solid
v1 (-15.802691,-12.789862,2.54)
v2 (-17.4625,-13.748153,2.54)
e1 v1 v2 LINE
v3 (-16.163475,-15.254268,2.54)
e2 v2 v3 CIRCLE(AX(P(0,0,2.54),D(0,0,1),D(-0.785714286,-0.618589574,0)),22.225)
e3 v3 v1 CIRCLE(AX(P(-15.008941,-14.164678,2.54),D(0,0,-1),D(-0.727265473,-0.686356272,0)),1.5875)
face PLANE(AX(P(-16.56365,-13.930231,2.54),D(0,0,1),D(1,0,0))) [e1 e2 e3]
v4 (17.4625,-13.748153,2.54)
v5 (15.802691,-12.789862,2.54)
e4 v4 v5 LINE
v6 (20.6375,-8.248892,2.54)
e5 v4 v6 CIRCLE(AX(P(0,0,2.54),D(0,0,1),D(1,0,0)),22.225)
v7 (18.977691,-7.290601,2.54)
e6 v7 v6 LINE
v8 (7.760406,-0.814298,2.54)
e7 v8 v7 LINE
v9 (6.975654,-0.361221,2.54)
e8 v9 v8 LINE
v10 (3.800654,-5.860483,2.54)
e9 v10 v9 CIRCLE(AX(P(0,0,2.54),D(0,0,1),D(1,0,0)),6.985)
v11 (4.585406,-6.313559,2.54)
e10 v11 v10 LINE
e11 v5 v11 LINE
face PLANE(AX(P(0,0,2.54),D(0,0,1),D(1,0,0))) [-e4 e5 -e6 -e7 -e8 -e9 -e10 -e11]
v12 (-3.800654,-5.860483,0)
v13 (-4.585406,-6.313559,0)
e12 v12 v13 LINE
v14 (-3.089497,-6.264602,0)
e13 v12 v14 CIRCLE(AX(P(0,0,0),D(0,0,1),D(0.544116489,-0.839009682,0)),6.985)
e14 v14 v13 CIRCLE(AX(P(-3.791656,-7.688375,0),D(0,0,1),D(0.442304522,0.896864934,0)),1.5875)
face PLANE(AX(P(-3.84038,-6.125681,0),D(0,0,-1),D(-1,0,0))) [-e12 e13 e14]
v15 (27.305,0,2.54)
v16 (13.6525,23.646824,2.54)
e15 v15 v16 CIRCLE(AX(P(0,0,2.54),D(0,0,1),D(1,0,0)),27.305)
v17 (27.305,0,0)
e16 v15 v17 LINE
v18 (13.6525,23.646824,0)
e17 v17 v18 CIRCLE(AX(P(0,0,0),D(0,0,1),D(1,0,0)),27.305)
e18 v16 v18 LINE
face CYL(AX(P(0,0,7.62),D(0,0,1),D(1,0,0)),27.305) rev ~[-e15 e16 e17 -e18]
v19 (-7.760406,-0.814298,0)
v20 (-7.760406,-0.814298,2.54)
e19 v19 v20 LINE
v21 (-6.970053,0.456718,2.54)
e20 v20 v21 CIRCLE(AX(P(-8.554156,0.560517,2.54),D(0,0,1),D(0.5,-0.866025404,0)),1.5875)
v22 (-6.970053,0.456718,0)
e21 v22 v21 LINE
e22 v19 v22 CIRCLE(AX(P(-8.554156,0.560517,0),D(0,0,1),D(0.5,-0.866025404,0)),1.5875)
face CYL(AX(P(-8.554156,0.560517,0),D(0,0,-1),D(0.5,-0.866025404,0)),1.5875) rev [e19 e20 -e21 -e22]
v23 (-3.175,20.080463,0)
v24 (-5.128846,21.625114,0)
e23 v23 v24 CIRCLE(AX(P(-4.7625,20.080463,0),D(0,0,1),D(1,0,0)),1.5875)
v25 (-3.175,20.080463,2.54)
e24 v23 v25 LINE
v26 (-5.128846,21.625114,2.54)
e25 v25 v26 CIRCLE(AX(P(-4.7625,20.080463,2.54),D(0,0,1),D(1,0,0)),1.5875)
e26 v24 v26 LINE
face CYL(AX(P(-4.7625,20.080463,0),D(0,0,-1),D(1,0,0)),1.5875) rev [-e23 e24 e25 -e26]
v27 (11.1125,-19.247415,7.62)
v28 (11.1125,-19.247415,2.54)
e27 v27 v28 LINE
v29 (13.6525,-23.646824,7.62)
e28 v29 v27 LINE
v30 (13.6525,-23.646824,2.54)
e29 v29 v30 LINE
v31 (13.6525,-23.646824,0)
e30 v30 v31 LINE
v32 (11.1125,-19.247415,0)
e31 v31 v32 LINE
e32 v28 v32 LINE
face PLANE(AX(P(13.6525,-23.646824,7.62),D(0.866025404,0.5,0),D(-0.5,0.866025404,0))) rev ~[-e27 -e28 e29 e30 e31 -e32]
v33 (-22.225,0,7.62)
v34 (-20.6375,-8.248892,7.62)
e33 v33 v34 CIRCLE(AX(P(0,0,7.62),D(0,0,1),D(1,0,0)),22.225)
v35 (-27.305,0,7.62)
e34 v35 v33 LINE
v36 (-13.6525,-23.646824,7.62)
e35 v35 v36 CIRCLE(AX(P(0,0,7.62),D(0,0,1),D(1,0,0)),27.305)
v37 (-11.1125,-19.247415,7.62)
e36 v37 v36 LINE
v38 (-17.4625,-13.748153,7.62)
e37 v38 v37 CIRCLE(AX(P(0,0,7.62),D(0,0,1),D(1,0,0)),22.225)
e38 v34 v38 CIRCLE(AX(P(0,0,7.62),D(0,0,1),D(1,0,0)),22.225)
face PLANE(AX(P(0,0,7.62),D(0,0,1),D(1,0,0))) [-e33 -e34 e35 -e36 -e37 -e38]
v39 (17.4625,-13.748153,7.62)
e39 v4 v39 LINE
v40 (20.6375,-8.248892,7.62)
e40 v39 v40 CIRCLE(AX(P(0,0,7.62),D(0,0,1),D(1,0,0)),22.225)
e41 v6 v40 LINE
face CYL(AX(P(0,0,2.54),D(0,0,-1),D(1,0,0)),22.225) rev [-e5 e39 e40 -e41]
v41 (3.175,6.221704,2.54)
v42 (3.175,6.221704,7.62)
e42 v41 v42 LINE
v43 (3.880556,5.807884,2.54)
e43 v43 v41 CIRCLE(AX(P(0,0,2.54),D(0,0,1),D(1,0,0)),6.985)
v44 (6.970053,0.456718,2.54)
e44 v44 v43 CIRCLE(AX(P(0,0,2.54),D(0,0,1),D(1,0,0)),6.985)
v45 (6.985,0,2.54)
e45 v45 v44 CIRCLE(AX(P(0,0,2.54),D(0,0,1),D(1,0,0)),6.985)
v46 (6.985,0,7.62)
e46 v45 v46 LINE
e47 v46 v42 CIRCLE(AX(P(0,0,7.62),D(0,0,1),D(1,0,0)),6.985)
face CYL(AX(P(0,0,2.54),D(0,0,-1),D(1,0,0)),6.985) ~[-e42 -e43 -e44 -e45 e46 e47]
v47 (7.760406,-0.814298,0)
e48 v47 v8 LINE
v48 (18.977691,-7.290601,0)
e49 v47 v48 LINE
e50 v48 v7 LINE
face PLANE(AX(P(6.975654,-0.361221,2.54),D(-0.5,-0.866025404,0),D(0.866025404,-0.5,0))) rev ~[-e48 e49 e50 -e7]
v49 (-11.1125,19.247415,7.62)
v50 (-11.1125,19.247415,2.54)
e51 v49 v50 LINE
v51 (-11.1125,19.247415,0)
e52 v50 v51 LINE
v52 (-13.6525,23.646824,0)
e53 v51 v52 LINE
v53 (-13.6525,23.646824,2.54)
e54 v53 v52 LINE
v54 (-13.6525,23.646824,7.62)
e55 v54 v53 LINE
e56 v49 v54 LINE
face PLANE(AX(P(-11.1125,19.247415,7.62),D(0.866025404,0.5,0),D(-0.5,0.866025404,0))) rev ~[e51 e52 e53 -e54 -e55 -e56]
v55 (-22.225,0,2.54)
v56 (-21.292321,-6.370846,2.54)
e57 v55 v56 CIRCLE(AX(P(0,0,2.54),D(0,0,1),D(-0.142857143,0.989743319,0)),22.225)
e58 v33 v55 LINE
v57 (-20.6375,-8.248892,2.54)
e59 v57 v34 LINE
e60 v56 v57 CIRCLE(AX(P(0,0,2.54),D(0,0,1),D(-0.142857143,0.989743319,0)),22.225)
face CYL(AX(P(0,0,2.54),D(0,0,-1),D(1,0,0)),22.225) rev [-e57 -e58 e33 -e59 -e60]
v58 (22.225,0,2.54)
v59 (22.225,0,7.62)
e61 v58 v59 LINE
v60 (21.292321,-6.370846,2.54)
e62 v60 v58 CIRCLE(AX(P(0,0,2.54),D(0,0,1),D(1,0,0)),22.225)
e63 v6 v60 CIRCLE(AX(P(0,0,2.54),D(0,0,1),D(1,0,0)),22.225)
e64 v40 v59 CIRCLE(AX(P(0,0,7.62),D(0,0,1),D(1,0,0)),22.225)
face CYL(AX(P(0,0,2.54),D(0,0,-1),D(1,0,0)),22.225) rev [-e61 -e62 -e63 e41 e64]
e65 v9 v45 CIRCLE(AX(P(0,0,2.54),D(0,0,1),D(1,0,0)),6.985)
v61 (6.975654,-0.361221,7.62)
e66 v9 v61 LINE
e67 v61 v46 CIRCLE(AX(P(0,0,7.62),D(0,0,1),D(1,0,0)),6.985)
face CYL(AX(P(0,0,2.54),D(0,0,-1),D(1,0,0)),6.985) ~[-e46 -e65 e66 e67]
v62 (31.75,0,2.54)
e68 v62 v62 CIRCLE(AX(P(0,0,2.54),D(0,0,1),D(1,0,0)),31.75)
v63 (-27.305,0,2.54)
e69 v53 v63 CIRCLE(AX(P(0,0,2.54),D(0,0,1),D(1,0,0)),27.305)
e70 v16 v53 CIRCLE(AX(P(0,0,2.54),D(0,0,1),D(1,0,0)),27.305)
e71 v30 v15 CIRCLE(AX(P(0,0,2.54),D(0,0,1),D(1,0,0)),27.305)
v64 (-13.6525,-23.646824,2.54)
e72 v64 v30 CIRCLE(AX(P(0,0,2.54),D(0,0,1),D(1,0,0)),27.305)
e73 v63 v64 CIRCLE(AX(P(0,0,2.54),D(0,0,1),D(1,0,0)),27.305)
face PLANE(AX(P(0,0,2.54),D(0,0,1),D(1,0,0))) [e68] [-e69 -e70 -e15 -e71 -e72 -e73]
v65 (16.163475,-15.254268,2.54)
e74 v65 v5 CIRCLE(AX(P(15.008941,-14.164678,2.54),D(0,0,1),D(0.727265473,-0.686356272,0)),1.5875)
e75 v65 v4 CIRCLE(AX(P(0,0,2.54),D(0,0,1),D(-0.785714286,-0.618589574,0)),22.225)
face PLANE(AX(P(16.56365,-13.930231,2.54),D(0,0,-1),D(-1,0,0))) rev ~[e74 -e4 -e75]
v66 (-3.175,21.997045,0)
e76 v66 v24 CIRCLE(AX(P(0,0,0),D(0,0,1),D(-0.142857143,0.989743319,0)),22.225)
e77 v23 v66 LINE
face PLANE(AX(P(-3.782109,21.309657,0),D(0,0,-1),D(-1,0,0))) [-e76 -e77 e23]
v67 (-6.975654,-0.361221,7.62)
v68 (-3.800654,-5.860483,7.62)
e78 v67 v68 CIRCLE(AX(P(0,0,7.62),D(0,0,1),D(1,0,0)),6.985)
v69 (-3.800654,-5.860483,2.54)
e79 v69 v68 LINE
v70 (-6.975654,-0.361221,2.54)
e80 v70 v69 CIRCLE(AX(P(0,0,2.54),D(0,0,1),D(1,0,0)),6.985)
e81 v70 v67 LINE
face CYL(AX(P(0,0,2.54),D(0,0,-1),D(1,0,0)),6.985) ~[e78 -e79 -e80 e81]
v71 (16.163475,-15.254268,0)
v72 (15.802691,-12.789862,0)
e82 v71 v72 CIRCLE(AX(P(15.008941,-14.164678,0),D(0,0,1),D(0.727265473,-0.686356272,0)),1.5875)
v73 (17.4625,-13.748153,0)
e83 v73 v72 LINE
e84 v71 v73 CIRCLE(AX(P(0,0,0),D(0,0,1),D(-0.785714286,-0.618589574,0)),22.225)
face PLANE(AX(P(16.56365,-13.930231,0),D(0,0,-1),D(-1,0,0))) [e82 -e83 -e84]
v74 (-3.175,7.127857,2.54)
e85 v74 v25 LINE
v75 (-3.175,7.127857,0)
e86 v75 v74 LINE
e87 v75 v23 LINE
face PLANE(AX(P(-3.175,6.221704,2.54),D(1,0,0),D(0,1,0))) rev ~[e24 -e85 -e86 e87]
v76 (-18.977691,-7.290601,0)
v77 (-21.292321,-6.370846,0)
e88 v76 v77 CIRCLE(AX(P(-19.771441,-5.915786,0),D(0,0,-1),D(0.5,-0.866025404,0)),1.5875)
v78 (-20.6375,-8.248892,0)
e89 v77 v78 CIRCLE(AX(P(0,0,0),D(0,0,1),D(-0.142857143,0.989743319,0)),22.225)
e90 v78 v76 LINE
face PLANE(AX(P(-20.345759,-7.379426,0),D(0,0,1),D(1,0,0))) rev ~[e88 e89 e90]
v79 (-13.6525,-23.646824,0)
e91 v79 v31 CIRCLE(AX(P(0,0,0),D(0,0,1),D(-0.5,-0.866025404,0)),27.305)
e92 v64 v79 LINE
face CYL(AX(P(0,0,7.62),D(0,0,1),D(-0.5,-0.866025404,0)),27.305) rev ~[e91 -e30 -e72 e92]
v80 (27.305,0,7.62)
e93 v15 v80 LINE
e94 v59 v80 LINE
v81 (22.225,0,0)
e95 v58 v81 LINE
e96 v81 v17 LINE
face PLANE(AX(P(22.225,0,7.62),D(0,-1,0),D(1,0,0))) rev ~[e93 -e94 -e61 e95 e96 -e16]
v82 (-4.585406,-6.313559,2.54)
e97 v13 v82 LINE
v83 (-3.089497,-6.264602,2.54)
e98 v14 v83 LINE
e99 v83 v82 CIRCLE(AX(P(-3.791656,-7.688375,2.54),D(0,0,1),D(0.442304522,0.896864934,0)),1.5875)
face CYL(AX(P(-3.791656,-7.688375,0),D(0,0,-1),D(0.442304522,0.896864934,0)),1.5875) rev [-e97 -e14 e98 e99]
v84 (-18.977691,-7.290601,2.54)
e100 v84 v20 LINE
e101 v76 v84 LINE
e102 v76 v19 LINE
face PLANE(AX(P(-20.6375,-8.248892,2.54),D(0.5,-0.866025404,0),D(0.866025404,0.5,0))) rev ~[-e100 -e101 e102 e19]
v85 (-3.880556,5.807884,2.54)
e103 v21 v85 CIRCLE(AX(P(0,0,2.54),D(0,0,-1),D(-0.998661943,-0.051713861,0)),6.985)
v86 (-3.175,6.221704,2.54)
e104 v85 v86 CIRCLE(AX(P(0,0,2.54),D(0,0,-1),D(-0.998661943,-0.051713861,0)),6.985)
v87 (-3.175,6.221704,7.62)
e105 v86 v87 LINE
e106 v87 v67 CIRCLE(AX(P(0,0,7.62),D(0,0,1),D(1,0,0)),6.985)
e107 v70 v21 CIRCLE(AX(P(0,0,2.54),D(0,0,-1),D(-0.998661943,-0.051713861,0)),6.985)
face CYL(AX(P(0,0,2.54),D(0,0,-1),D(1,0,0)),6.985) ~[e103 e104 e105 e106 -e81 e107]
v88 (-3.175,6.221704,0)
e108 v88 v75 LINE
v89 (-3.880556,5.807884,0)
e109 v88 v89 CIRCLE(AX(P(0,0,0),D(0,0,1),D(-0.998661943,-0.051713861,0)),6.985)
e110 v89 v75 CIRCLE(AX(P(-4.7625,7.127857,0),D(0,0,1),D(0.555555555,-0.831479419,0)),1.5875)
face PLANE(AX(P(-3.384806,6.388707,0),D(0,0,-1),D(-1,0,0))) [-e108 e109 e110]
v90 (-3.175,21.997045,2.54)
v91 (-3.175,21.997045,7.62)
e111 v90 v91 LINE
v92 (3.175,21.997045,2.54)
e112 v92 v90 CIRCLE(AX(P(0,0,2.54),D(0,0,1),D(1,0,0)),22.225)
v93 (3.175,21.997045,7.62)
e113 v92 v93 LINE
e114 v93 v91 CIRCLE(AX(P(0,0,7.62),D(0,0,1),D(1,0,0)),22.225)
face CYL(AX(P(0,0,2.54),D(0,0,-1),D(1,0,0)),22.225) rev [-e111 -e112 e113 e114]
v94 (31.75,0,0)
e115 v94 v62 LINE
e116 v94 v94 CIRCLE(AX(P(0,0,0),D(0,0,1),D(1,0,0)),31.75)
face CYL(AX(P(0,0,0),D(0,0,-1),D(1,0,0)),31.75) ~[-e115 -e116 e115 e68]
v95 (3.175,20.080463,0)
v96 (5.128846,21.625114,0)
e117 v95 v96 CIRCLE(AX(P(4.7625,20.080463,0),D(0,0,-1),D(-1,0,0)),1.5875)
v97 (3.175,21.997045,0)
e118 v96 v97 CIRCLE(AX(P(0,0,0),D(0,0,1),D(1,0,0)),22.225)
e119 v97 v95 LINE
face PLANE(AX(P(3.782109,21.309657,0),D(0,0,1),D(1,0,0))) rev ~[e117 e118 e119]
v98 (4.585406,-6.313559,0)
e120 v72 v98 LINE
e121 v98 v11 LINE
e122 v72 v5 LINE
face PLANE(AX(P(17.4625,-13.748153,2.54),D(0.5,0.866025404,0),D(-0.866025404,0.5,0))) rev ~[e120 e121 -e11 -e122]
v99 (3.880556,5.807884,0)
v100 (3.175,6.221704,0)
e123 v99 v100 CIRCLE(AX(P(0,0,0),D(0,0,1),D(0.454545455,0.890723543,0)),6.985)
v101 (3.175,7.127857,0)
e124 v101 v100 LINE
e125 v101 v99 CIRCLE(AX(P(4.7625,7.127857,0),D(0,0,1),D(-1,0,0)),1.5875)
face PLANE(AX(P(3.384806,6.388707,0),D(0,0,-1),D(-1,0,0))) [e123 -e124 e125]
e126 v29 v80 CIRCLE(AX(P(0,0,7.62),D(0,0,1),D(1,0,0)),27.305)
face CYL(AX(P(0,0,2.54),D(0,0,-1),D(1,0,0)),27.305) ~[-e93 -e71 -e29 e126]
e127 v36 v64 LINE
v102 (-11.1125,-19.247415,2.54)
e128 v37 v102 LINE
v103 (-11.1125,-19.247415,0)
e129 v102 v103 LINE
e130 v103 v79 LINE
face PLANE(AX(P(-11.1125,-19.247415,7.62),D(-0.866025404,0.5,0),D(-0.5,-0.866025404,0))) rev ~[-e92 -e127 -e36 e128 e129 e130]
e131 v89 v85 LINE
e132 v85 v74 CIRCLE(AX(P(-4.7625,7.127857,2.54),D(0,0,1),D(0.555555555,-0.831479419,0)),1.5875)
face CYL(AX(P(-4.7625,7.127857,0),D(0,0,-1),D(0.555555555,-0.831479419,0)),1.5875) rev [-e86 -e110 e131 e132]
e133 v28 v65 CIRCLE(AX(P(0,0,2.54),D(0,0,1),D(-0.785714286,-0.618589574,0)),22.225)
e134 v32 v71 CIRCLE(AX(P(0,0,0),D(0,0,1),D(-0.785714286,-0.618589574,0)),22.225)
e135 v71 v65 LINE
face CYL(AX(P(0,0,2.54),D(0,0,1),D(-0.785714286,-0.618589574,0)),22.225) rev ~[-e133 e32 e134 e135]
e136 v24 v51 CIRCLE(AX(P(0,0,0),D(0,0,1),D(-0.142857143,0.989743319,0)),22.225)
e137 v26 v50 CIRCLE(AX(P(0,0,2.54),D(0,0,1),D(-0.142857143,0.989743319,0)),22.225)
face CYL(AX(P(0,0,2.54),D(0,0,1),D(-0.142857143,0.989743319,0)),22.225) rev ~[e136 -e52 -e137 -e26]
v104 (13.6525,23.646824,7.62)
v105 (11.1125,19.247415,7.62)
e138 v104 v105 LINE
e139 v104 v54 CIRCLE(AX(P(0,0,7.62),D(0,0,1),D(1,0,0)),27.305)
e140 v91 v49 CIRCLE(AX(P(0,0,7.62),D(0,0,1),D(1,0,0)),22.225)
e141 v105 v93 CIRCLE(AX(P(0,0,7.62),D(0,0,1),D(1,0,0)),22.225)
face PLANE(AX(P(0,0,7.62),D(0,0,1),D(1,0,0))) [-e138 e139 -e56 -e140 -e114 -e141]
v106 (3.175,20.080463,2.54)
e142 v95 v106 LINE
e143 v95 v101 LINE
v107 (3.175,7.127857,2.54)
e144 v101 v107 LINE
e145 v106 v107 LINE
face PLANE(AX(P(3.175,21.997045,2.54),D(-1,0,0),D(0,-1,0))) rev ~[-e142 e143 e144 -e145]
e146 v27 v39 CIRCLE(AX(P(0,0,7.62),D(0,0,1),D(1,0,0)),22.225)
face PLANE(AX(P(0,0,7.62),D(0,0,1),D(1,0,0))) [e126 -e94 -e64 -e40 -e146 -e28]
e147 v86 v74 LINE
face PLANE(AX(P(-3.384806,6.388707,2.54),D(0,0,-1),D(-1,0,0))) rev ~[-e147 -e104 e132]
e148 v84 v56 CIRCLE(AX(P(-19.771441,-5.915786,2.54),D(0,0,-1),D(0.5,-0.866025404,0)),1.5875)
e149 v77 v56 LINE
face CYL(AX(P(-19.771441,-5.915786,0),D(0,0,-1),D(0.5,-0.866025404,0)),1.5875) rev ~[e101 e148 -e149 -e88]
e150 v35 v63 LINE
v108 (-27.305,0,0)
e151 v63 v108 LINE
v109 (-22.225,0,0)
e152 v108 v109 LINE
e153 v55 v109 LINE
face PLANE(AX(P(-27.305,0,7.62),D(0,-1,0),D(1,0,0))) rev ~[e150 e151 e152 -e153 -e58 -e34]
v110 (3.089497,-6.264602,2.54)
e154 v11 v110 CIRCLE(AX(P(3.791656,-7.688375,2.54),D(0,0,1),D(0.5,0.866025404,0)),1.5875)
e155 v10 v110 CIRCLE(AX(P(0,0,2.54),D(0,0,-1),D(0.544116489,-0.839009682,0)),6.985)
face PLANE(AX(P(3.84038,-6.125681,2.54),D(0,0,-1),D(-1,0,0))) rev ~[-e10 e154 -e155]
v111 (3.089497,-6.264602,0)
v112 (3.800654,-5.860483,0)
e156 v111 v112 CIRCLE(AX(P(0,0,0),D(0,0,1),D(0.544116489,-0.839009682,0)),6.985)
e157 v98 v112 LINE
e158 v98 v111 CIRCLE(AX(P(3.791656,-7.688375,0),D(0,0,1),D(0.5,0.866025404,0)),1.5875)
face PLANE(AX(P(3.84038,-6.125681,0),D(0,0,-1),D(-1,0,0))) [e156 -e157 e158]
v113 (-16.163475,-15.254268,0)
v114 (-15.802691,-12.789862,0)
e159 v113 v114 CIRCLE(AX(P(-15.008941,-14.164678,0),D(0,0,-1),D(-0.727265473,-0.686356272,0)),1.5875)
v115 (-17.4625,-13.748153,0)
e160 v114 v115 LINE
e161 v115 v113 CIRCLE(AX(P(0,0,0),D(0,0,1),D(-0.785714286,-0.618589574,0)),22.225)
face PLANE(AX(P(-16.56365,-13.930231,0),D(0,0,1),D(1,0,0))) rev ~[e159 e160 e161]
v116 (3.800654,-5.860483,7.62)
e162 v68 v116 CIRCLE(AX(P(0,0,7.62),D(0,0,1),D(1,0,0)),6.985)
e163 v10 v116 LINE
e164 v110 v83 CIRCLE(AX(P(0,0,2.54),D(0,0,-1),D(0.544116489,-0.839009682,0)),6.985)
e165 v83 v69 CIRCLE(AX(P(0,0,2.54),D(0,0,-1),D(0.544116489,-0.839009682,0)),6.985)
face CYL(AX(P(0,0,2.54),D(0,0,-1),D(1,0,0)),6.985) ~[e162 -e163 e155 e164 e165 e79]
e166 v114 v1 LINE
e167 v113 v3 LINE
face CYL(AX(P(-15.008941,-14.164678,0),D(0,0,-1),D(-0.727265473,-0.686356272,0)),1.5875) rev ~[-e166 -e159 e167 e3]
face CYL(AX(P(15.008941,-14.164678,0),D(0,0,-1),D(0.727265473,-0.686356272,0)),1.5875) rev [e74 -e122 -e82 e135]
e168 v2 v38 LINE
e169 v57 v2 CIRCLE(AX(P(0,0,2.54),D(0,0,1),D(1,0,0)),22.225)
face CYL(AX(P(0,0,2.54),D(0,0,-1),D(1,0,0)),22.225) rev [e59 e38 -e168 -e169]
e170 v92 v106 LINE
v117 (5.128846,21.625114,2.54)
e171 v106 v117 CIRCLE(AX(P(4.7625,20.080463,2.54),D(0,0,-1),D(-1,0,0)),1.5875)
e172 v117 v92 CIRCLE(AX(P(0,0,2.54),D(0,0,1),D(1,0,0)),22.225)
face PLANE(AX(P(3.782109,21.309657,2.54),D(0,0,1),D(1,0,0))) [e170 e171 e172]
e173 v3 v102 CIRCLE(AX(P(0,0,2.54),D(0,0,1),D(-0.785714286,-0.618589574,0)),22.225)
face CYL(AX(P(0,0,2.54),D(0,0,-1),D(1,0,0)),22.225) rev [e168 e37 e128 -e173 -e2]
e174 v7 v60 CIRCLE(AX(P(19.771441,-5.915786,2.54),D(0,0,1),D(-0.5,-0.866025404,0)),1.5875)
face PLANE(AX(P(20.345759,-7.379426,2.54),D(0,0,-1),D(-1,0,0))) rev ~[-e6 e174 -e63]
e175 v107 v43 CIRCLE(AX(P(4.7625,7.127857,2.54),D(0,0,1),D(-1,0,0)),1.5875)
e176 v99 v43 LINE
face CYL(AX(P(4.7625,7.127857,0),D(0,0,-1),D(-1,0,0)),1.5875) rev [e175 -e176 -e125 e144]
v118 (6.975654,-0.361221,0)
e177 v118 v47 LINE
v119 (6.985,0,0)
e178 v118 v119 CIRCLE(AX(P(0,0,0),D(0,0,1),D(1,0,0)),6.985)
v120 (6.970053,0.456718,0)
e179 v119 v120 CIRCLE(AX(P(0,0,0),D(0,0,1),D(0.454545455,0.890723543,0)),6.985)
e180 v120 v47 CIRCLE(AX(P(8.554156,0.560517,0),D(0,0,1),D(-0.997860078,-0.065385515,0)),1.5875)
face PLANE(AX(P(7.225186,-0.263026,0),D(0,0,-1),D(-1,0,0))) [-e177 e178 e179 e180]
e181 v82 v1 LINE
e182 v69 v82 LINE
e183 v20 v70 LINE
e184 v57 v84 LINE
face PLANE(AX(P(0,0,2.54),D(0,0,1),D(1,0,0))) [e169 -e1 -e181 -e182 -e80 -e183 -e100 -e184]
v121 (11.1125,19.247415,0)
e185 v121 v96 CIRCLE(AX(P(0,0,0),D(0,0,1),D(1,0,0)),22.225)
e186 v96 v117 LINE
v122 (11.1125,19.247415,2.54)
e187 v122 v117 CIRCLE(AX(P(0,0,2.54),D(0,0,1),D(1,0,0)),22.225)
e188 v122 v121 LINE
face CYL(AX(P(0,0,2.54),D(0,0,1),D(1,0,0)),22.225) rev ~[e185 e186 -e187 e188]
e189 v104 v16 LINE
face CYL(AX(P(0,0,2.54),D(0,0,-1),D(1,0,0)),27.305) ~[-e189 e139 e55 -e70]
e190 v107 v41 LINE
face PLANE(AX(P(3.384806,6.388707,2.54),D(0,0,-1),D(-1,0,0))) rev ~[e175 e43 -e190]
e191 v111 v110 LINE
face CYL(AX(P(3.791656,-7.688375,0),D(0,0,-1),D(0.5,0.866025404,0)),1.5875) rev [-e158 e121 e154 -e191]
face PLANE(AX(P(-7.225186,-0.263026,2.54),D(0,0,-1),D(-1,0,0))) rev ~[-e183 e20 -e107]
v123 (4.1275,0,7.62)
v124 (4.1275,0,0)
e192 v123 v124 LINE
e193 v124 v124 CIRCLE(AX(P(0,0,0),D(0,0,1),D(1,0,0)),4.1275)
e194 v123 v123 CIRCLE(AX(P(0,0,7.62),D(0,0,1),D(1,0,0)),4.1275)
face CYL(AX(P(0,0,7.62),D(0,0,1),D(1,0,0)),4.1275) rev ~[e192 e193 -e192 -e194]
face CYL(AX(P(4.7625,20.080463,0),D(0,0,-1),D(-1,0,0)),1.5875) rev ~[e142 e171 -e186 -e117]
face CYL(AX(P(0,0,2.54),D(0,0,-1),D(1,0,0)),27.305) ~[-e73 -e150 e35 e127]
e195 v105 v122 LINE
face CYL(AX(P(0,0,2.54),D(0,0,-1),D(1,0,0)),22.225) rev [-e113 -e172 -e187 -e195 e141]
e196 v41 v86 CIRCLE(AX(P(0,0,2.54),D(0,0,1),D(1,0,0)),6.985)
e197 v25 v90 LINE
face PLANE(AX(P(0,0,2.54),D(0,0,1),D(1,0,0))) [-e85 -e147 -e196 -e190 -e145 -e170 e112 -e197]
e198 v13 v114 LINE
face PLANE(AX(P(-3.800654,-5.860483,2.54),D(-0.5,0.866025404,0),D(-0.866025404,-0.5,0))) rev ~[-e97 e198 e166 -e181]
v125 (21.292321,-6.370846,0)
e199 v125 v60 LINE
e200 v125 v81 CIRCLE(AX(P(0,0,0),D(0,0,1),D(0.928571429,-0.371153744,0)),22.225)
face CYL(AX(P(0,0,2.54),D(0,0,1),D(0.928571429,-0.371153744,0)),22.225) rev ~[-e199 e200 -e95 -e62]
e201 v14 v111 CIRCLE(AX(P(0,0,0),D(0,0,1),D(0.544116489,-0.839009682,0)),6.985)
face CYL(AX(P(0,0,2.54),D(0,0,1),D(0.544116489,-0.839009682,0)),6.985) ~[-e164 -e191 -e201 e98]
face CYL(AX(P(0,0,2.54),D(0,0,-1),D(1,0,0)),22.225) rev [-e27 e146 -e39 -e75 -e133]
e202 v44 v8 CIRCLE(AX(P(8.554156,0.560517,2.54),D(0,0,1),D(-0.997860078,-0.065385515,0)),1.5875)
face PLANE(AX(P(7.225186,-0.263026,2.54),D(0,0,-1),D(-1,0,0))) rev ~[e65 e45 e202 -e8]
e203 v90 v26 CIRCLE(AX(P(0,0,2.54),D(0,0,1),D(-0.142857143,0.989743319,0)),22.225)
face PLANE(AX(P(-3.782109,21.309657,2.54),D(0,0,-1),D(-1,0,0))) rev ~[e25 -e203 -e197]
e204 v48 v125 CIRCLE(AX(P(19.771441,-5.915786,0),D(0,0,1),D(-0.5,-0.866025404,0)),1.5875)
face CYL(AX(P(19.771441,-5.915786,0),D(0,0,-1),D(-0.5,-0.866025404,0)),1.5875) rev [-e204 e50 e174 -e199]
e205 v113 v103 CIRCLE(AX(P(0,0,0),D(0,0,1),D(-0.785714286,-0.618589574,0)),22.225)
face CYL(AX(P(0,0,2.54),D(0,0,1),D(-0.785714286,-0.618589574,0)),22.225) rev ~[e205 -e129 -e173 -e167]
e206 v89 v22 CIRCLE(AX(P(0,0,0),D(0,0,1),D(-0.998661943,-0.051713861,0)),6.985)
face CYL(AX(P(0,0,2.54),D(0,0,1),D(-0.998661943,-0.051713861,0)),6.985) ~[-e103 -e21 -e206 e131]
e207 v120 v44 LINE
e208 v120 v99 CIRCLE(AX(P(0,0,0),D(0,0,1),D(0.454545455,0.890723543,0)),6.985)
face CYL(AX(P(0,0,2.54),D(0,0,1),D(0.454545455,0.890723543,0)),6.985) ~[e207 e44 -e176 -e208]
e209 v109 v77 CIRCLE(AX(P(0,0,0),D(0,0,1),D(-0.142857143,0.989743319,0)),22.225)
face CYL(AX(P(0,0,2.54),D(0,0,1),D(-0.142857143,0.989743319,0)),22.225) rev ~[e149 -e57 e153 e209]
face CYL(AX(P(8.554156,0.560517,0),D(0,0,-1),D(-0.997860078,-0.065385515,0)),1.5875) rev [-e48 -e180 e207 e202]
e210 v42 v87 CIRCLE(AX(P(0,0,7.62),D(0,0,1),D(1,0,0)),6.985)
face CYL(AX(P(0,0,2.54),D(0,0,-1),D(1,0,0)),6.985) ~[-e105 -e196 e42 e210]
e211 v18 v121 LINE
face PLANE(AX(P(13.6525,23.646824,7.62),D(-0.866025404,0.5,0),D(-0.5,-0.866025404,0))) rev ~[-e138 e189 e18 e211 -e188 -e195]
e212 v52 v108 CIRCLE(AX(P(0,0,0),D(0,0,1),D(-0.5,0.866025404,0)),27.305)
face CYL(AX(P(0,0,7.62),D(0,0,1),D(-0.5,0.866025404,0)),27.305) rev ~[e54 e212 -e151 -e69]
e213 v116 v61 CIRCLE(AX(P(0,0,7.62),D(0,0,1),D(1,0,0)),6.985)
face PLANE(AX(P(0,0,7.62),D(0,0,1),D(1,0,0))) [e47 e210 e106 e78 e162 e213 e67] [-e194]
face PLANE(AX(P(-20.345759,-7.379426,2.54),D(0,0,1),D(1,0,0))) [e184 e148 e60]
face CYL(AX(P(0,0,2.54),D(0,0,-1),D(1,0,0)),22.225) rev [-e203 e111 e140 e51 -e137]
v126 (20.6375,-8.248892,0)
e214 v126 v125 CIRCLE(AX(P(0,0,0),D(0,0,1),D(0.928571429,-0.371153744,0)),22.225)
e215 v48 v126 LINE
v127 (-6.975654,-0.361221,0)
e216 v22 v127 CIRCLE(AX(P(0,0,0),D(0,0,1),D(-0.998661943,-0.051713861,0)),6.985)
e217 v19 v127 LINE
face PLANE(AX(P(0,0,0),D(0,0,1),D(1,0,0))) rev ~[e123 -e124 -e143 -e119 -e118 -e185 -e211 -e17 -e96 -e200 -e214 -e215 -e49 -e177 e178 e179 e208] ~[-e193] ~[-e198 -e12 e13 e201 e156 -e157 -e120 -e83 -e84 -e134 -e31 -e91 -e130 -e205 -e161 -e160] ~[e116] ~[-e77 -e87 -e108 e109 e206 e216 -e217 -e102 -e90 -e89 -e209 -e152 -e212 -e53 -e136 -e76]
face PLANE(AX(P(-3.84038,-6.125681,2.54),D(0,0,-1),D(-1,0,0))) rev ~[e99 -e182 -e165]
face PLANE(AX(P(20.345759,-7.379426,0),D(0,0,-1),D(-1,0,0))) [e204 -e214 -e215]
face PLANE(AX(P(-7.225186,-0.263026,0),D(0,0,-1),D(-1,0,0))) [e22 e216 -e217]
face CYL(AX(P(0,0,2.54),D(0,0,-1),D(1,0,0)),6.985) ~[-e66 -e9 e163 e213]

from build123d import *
from build123d import SkipClean  # not in build123d's __all__

# Parameters (mm, degrees)
F0_R          = 31.75
F1_DEPTH      = 2.54
F2_R          = 27.305
F2_R_2        = 22.225
F2_R_3        = 6.985
F3_DEPTH      = 5.08
F4_R          = 4.1275
F5_DEPTH      = 25.4
F5_DEPTH_BACK = 96
F7_DEPTH      = 25.4
F7_DEPTH_BACK = 5.081
F8_T1_DEPTH   = 2.54
F10_DEPTH     = 25.4


# Not quite as in the source:
# - a fillet or chamfer that OpenCascade refuses, or shapes differently, is made with other operations: its cross-section is extruded or revolved along the edge and cut away or added
# - an extrude ends at something that could not be found from the text; its depth is read off the source's solid


with BuildPart() as f1:
    # F0 (on Top) → F1 (new body)
    with BuildSketch(Plane.XY):
        Circle(F0_R)
    extrude(amount=F1_DEPTH)

    # F2 (on face) → F3 (join)
    with BuildSketch(Plane.XY.offset(2.54)):
        Circle(F2_R)
        Circle(F2_R_2, mode=Mode.SUBTRACT)
        Circle(F2_R_3)
    extrude(amount=F3_DEPTH)

    # F4 (on face) → F5 (cut, two sides)
    with BuildSketch(Plane.XY.offset(7.62)) as f5_sk:
        Circle(F4_R)
    extrude(amount=-F5_DEPTH, mode=Mode.SUBTRACT)
    extrude(f5_sk.sketch, amount=F5_DEPTH_BACK, mode=Mode.SUBTRACT)

    # F6 (on face) → F7 (cut, two sides)
    with BuildSketch(Plane.XY.offset(2.54)) as f7_sk:
        with BuildLine():
            Line((3.175, 21.9970452561), (3.175, 6.2217039467))
            ThreePointArc((3.175, 6.2217039467), (5.956828015, 3.6477972806), (6.985, 0))
            ThreePointArc((6.985, 0), (6.9826630272, -0.1806711053), (6.9756536726, -0.3612213163))
            Line((6.9756536726, -0.3612213163), (20.6375, -8.248891971))
            ThreePointArc((20.6375, -8.248891971), (21.8245167472, -4.2001302063), (22.225, 0))
            ThreePointArc((22.225, 0), (16.8005208253, 14.5496778315), (3.175, 21.9970452561))
        make_face()
        with BuildLine():
            Line((17.4625, -13.7481532851), (3.8006536726, -5.8604826304))
            ThreePointArc((3.8006536726, -5.8604826304), (0, -6.985), (-3.8006536726, -5.8604826304))
            Line((-3.8006536726, -5.8604826304), (-17.4625, -13.7481532851))
            ThreePointArc((-17.4625, -13.7481532851), (0, -22.225), (17.4625, -13.7481532851))
        make_face()
        with BuildLine():
            ThreePointArc((-6.9756536726, -0.3612213163), (-6.0491874454, 3.4925), (-3.175, 6.2217039467))
            Line((-3.175, 6.2217039467), (-3.175, 21.9970452561))
            ThreePointArc((-3.175, 21.9970452561), (-19.2474145991, 11.1125), (-20.6375, -8.248891971))
            Line((-20.6375, -8.248891971), (-6.9756536726, -0.3612213163))
        make_face()
    with SkipClean():  # cleaning this boolean's faces spoils the solid; the shape is the same uncleaned
        extrude(amount=-F7_DEPTH, mode=Mode.SUBTRACT)
        extrude(f7_sk.sketch, amount=F7_DEPTH_BACK, mode=Mode.SUBTRACT)

    # F8: fillet of radius 1.5875 on 18 edges, made by hand

    # F8_s2 → F8_t1 (join)
    with BuildSketch(Plane.XY):
        with BuildLine():
            ThreePointArc((16.1634751393, -15.2542681378), (16.5796979287, -13.9347220137), (15.8026912008, -12.7898622281))
            Line((15.8026912008, -12.7898622281), (17.4625, -13.7481532851))
            ThreePointArc((17.4625, -13.7481532851), (16.829843924, -14.515749326), (16.1634751393, -15.2542681378))
        make_face()
        with BuildLine():
            ThreePointArc((18.9776912008, -7.290600914), (20.3576722229, -7.3910785865), (21.2923212932, -6.3708460152))
            ThreePointArc((21.2923212932, -6.3708460152), (20.9859296333, -7.3171977169), (20.6375, -8.248891971))
            Line((20.6375, -8.248891971), (18.9776912008, -7.290600914))
        make_face()
        with BuildLine():
            ThreePointArc((3.175, 20.0804631421), (3.7779742942, 21.3258006002), (5.1288461538, 21.625114153))
            ThreePointArc((5.1288461538, 21.625114153), (4.1560857093, 21.8329470429), (3.175, 21.9970452561))
            Line((3.175, 21.9970452561), (3.175, 20.0804631421))
        make_face()
        with BuildLine():
            ThreePointArc((-3.175, 20.0804631421), (-3.7779742942, 21.3258006002), (-5.1288461538, 21.625114153))
            ThreePointArc((-5.1288461538, 21.625114153), (-4.1560857093, 21.8329470429), (-3.175, 21.9970452561))
            Line((-3.175, 21.9970452561), (-3.175, 20.0804631421))
        make_face()
        with BuildLine():
            ThreePointArc((-18.9776912008, -7.290600914), (-20.3576722229, -7.3910785865), (-21.2923212932, -6.3708460152))
            ThreePointArc((-21.2923212932, -6.3708460152), (-20.9859296333, -7.3171977169), (-20.6375, -8.248891971))
            Line((-20.6375, -8.248891971), (-18.9776912008, -7.290600914))
        make_face()
        with BuildLine():
            ThreePointArc((-16.1634751393, -15.2542681378), (-16.5796979287, -13.9347220137), (-15.8026912008, -12.7898622281))
            Line((-15.8026912008, -12.7898622281), (-17.4625, -13.7481532851))
            ThreePointArc((-17.4625, -13.7481532851), (-16.829843924, -14.515749326), (-16.1634751393, -15.2542681378))
        make_face()
        with BuildLine():
            ThreePointArc((4.5854055152, -6.3135593179), (3.8435830552, -6.1017241554), (3.0894970865, -6.2646015638))
            ThreePointArc((3.0894970865, -6.2646015638), (3.4509958561, -6.0729607772), (3.8006536726, -5.8604826304))
            Line((3.8006536726, -5.8604826304), (4.5854055152, -6.3135593179))
        make_face()
        with BuildLine():
            ThreePointArc((-3.0894970865, -6.2646015638), (-3.8435830552, -6.1017241554), (-4.5854055152, -6.3135593179))
            Line((-4.5854055152, -6.3135593179), (-3.8006536726, -5.8604826304))
            ThreePointArc((-3.8006536726, -5.8604826304), (-3.4509958561, -6.0729607772), (-3.0894970865, -6.2646015638))
        make_face()
        with BuildLine():
            ThreePointArc((-7.7604055152, -0.8142980039), (-7.2060396531, -0.2777784896), (-6.970052642, 0.4567178201))
            ThreePointArc((-6.970052642, 0.4567178201), (-6.9848362373, 0.0478303088), (-6.9756536726, -0.3612213163))
            Line((-6.9756536726, -0.3612213163), (-7.7604055152, -0.8142980039))
        make_face()
        with BuildLine():
            ThreePointArc((-3.8805555556, 5.8078837437), (-3.3624565979, 6.379502645), (-3.175, 7.1278573218))
            Line((-3.175, 7.1278573218), (-3.175, 6.2217039467))
            ThreePointArc((-3.175, 6.2217039467), (-3.5338403812, 6.0251304683), (-3.8805555556, 5.8078837437))
        make_face()
        with BuildLine():
            ThreePointArc((3.175, 7.1278573218), (3.3624565979, 6.379502645), (3.8805555556, 5.8078837437))
            ThreePointArc((3.8805555556, 5.8078837437), (3.5338403812, 6.0251304683), (3.175, 6.2217039467))
            Line((3.175, 6.2217039467), (3.175, 7.1278573218))
        make_face()
        with BuildLine():
            ThreePointArc((6.970052642, 0.4567178201), (7.2060396531, -0.2777784896), (7.7604055152, -0.8142980039))
            Line((7.7604055152, -0.8142980039), (6.9756536726, -0.3612213163))
            ThreePointArc((6.9756536726, -0.3612213163), (6.9848362373, 0.0478303088), (6.970052642, 0.4567178201))
        make_face()
    with SkipClean():  # cleaning this boolean's faces spoils the solid; the shape is the same uncleaned
        extrude(amount=F8_T1_DEPTH)

    # F9 (on face) → F10 (cut)
    with BuildSketch(Plane.XY.offset(7.62)):
        with BuildLine():
            ThreePointArc((27.305, 0), (23.6468236503, 13.6525), (13.6525, 23.6468236503))
            Line((13.6525, 23.6468236503), (11.1125, 19.2474145991))
            ThreePointArc((11.1125, 19.2474145991), (19.2474145991, 11.1125), (22.225, 0))
            Line((22.225, 0), (27.305, 0))
        make_face()
        with BuildLine():
            Line((-11.1125, -19.2474145991), (-13.6525, -23.6468236503))
            ThreePointArc((-13.6525, -23.6468236503), (0, -27.305), (13.6525, -23.6468236503))
            Line((13.6525, -23.6468236503), (11.1125, -19.2474145991))
            ThreePointArc((11.1125, -19.2474145991), (0, -22.225), (-11.1125, -19.2474145991))
        make_face()
        with BuildLine():
            ThreePointArc((-22.225, 0), (-19.2474145991, 11.1125), (-11.1125, 19.2474145991))
            Line((-11.1125, 19.2474145991), (-13.6525, 23.6468236503))
            ThreePointArc((-13.6525, 23.6468236503), (-23.6468236503, 13.6525), (-27.305, 0))
            Line((-27.305, 0), (-22.225, 0))
        make_face()
    with SkipClean():  # cleaning this boolean's faces spoils the solid; the shape is the same uncleaned
        extrude(amount=-F10_DEPTH, mode=Mode.SUBTRACT)


solid = f1.part
